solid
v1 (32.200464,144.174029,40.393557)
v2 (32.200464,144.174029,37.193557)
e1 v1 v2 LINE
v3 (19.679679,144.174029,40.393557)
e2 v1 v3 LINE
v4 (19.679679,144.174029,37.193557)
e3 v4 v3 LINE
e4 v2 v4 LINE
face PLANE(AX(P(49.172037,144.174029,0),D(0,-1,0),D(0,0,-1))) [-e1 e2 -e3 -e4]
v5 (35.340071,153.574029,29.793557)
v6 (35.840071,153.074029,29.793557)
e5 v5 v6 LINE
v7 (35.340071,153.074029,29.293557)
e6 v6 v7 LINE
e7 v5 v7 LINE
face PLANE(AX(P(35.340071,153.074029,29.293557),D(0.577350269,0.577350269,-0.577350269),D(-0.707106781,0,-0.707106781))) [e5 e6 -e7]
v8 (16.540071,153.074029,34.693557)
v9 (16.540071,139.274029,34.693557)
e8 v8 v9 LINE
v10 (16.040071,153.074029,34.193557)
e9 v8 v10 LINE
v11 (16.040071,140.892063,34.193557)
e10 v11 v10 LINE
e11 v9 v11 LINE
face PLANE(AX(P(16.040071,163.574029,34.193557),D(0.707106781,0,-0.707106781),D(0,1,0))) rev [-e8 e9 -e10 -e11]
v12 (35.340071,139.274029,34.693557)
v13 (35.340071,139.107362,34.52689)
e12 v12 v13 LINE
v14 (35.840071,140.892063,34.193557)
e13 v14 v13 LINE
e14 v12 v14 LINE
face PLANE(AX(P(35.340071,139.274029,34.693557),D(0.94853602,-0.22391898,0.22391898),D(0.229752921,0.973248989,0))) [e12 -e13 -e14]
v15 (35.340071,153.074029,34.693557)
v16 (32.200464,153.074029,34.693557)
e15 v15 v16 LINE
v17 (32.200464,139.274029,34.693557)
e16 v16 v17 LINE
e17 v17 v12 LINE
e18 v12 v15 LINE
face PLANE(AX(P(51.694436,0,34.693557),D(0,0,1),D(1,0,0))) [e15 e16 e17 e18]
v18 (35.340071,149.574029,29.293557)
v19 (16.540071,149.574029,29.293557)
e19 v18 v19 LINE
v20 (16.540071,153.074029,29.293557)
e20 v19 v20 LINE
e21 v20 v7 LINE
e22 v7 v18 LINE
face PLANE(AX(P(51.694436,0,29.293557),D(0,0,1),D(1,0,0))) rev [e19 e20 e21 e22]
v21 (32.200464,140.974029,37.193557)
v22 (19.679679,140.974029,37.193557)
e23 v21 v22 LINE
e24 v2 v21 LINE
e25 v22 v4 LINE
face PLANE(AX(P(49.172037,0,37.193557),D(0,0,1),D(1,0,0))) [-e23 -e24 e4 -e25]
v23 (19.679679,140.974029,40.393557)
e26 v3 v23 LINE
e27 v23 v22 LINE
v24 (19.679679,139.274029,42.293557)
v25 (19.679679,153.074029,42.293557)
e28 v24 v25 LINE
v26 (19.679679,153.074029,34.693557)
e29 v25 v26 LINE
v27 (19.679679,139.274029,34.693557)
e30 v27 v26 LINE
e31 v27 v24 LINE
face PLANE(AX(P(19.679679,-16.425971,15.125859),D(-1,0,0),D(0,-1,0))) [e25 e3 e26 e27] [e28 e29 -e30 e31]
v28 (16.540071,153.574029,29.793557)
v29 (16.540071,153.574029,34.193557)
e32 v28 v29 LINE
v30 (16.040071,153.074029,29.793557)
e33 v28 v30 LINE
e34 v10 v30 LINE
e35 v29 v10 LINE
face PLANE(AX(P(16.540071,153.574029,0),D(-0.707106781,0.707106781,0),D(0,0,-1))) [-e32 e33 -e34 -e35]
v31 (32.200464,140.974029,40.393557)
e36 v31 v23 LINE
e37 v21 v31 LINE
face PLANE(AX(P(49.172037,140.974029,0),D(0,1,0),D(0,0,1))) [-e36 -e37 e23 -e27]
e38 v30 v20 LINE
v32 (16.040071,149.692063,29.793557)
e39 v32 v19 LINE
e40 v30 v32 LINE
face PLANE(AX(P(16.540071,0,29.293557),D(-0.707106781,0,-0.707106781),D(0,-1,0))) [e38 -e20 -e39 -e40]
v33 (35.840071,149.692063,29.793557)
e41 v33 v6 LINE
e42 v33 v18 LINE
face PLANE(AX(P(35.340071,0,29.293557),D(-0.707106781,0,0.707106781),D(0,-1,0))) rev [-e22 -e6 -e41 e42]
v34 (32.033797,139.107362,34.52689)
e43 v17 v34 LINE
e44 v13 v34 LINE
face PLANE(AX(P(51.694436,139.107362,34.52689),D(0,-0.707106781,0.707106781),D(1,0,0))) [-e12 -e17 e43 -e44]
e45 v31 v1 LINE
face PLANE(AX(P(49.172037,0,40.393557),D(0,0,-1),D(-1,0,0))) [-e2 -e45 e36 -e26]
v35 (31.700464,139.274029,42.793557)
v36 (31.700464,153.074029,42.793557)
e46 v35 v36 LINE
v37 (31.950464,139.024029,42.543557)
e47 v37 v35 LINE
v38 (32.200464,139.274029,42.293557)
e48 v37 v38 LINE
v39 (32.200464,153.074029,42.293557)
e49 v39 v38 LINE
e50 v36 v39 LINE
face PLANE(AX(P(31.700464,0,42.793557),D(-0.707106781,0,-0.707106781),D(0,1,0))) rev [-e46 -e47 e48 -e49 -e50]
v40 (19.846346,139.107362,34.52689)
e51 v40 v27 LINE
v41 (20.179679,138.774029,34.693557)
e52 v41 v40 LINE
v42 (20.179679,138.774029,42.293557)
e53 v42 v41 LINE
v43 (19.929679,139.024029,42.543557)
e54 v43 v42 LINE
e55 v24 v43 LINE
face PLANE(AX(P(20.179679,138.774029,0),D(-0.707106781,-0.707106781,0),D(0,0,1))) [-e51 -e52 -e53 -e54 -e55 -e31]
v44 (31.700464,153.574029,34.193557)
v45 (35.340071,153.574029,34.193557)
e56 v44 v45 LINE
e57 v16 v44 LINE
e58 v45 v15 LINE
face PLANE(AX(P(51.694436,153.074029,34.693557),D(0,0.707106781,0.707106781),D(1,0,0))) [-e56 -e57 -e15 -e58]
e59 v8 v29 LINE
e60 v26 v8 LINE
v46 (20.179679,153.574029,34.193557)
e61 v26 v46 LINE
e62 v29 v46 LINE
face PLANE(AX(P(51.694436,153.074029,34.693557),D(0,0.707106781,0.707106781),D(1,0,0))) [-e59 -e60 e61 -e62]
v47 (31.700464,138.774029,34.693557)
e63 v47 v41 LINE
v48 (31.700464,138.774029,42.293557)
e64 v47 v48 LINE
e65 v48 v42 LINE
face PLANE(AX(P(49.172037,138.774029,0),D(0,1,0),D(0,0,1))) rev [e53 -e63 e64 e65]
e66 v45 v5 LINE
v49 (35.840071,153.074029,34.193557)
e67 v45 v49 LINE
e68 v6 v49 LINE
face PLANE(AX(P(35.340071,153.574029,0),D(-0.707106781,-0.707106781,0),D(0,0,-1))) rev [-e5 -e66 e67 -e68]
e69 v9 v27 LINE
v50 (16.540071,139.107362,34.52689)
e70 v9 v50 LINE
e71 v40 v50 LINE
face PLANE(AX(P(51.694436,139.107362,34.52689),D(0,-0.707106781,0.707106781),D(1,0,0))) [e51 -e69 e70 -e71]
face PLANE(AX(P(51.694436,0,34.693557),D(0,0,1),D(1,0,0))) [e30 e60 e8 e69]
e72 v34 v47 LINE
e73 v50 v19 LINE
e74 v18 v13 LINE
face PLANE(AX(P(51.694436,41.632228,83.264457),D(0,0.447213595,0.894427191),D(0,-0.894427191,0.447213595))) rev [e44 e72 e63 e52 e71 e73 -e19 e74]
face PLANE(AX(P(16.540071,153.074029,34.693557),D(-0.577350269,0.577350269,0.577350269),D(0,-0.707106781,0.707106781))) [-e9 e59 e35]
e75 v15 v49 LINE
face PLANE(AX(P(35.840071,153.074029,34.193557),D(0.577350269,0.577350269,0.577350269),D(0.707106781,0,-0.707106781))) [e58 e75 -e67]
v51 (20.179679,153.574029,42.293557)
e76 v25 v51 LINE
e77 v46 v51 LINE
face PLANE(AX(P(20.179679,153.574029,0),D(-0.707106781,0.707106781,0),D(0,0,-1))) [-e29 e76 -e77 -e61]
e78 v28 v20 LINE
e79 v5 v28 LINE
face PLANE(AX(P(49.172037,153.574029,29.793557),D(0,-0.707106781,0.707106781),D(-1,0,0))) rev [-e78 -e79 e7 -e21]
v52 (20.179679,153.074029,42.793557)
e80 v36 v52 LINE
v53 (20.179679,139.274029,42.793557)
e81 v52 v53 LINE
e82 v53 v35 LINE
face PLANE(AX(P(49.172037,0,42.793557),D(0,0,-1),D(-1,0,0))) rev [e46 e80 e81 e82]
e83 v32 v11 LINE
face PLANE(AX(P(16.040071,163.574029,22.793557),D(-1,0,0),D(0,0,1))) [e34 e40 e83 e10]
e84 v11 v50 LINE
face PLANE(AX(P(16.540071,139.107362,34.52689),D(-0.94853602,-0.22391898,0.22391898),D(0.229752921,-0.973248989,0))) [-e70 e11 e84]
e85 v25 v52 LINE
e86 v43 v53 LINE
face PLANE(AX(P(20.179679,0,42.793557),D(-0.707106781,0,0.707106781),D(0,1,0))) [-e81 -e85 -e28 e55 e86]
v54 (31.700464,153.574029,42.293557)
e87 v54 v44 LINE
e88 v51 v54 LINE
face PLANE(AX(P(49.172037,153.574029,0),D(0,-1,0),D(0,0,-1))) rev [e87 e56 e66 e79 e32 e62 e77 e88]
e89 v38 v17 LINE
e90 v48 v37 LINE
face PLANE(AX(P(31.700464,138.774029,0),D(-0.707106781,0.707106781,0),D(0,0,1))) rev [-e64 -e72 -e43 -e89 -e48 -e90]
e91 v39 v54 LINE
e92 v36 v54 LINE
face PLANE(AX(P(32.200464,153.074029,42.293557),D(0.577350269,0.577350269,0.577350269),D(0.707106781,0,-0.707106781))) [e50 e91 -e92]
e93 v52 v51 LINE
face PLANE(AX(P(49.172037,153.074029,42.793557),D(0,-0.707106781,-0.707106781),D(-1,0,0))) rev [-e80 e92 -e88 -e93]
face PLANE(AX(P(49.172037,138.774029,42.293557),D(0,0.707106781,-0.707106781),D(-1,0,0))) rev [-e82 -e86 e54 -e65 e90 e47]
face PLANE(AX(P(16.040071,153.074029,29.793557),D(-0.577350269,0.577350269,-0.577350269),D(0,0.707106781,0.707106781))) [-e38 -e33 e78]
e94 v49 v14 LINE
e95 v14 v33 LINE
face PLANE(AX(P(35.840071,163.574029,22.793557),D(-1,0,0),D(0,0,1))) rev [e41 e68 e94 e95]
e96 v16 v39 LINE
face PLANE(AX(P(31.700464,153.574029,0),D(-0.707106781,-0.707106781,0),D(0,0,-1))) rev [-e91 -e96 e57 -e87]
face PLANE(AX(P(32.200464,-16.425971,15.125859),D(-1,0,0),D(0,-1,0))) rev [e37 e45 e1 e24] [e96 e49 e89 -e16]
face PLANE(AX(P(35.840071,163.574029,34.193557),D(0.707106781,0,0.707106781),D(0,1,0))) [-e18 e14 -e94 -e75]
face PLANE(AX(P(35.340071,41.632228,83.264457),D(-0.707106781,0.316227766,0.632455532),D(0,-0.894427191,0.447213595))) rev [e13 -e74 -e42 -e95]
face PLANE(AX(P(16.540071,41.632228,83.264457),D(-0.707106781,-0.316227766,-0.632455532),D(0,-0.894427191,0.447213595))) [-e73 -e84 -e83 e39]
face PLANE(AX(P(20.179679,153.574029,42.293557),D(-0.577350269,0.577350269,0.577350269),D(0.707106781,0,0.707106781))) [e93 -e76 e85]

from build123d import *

# Parameters (mm, degrees)
BOSS_EXTRUDE1_DEPTH      = 6.260392
BOSS_EXTRUDE1_DEPTH_BACK = 6.260392
SKETCH4_W                = 8.1
SKETCH4_H                = 14.8
SKETCH4_W_2              = 3.2
SKETCH4_H_2              = 3.2
BOSS_EXTRUDE2_DEPTH      = 9.9
BOSS_EXTRUDE2_DEPTH_BACK = 9.9
CHAMFER2_SIZE            = 0.5


with BuildPart() as part:
    # Sketch4 → Boss-Extrude1 (new, two sides: drawn at the far end of the back side and taken through both)
    with BuildSketch(Plane(origin=(25.940071358, 0, 0), x_dir=(0, 0, -1), z_dir=(1, 0, 0)).offset(-BOSS_EXTRUDE1_DEPTH_BACK)):
        with Locations((-38.743556796, 146.174028513)):
            Rectangle(SKETCH4_W, SKETCH4_H)
        with Locations((-38.793556796, 142.574028513)):
            Rectangle(SKETCH4_W_2, SKETCH4_H_2, mode=Mode.SUBTRACT)
    extrude(amount=BOSS_EXTRUDE1_DEPTH + BOSS_EXTRUDE1_DEPTH_BACK)

    # Sketch4<5> → Boss-Extrude2 (add, two sides: drawn at the far end of the back side and taken through both)
    with BuildSketch(Plane(origin=(25.940071358, 0, 0), x_dir=(0, 0, -1), z_dir=(1, 0, 0)).offset(-BOSS_EXTRUDE2_DEPTH_BACK)):
        Polygon((-34.693556796, 153.574028513), (-34.693556796, 138.774028513), (-29.293556796, 149.574028513), (-29.293556796, 153.574028513), align=None)
    extrude(amount=BOSS_EXTRUDE2_DEPTH + BOSS_EXTRUDE2_DEPTH_BACK)

    # Chamfer1
    # the kernel refuses this chamfer: 0.5, 0.372677996 mm, written as the material it takes off along each edge
    with BuildSketch(Plane(origin=(31.867130024, 153.240695179, 42.460223463), x_dir=(0, 0.7071067811865475, -0.7071067811865475), z_dir=(0.5773502691896258, 0.5773502691896258, 0.5773502691896258)), Plane(origin=(35.506738024, 153.240695179, 34.360223463), x_dir=(0, 0.7071067811865475, -0.7071067811865475), z_dir=(0.5773502691896258, 0.5773502691896258, 0.5773502691896258)), Plane(origin=(16.373404691, 153.240695179, 34.360223463), x_dir=(0, -0.7071067811865475, 0.7071067811865475), z_dir=(-0.5773502691896258, 0.5773502691896258, 0.5773502691896258))) as chamfer1_piece_1:
        Polygon((-0.353553391, 0.204124145), (0.353553391, 0.204124145), (0, -0.40824829), align=None)
    extrude(amount=0.635085296, mode=Mode.SUBTRACT)
    with BuildSketch(Plane(origin=(20.013012691, 153.240695179, 42.460223463), x_dir=(0, 0.7071067811865475, -0.7071067811865475), z_dir=(-0.5773502691896258, 0.5773502691896258, 0.5773502691896258)), Plane(origin=(35.506738024, 153.240695179, 29.62689013), x_dir=(0.7071067811865475, -0.7071067811865475, 0), z_dir=(0.5773502691896258, 0.5773502691896258, -0.5773502691896258)), Plane(origin=(16.373404691, 153.240695179, 29.62689013), x_dir=(0, -0.7071067811865475, -0.7071067811865475), z_dir=(-0.5773502691896258, 0.5773502691896258, -0.5773502691896258))) as chamfer1_piece_2:
        Polygon((-0.353553391, -0.204124145), (0.353553391, -0.204124145), (0, 0.40824829), align=None)
    extrude(amount=0.635085296, mode=Mode.SUBTRACT)
    with BuildSketch(Plane(origin=(35.506738024, 139.75781762, 34.471334574), x_dir=(0, -0.7071067811865777, -0.7071067811865174), z_dir=(0.9485360198619486, -0.223918979794528, 0.22391897979454709))) as chamfer1_piece_3:
        Polygon((0.184955718, -0.526311482), (0.420657979, -0.526311482), (-0.605613697, 1.052622965), align=None)
    extrude(amount=0.64485025, mode=Mode.SUBTRACT)
    with BuildSketch(Plane(origin=(16.373404691, 139.75781762, 34.471334574), x_dir=(0, 0.7071067811865777, 0.7071067811865174), z_dir=(-0.9485360198619486, -0.223918979794528, 0.22391897979454709))) as chamfer1_piece_4:
        Polygon((-0.420657979, -0.526311482), (-0.184955718, -0.526311482), (0.605613697, 1.052622965), align=None)
    extrude(amount=0.64485025, mode=Mode.SUBTRACT)
    with BuildSketch(Plane(origin=(18.393837864, 138.774028513, 42.793556796), x_dir=(0, 0.999621916911297, 0.027495876610582292), z_dir=(1, 0, 0))) as chamfer1_piece_5:
        with BuildLine():
            Line((0.514336598, 0), (-0.028273577, -0.513558897))
            Line((-0.028273577, -0.513558897), (-0.038269797, -0.513283938))
            ThreePointArc((-0.038269797, -0.513283938), (-0.017064614, -0.256698915), (-0.009996219, 0.000274959))
            Line((-0.009996219, 0.000274959), (0.000274959, 0.009996219))
            ThreePointArc((0.000274959, 0.009996219), (0.257248832, 0.002927825), (0.514611556, 0.009996219))
            Line((0.514611556, 0.009996219), (0.514336598, 0))
        make_face()
    extrude(amount=15.092466988, mode=Mode.SUBTRACT)
    with BuildSketch(Plane(origin=(33.486304852, 153.574028513, 42.793556796), x_dir=(0, 0.02749587661058229, -0.9996219169112968), z_dir=(-1, 0, 0))) as chamfer1_piece_6:
        with BuildLine():
            Line((0.514336598, 0), (-0.028273577, 0.513558897))
            Line((-0.028273577, 0.513558897), (-0.038269797, 0.513283938))
            ThreePointArc((-0.038269797, 0.513283938), (-0.017064614, 0.256698915), (-0.009996219, -0.000274959))
            Line((-0.009996219, -0.000274959), (0.000274959, -0.009996219))
            ThreePointArc((0.000274959, -0.009996219), (0.257248832, -0.002927825), (0.514611556, -0.009996219))
            Line((0.514611556, -0.009996219), (0.514336598, 0))
        make_face()
    extrude(amount=15.092466988, mode=Mode.SUBTRACT)
    with BuildSketch(Plane(origin=(32.200463358, 154.859870007, 42.793556796), x_dir=(0.02749587661058229, 0, -0.9996219169112968), z_dir=(0, -1, 0)), Plane(origin=(19.679679358, 154.859870007, 42.793556796), x_dir=(0.999621916911297, 0, 0.027495876610582105), z_dir=(0, -1, 0)), Plane(origin=(16.040071358, 154.859870007, 34.693556796), x_dir=(0.999621916911297, 0, 0.027495876610582105), z_dir=(0, -1, 0))) as chamfer1_piece_7:
        with BuildLine():
            Line((0.514336598, 0), (-0.028273577, -0.513558897))
            Line((-0.028273577, -0.513558897), (-0.038269797, -0.513283938))
            ThreePointArc((-0.038269797, -0.513283938), (-0.017064614, -0.256698915), (-0.009996219, 0.000274959))
            Line((-0.009996219, 0.000274959), (0.000274959, 0.009996219))
            ThreePointArc((0.000274959, 0.009996219), (0.257248832, 0.002927825), (0.514611556, 0.009996219))
            Line((0.514611556, 0.009996219), (0.514336598, 0))
        make_face()
    extrude(amount=17.371682988, mode=Mode.SUBTRACT)
    with BuildSketch(Plane(origin=(32.200463358, 153.574028513, 34.693556796), x_dir=(-0.999621916911297, 0.027495876610582105, 0), z_dir=(0, 0, 1))) as chamfer1_piece_8:
        with BuildLine():
            Line((0.514336598, 0), (-0.028273577, 0.513558897))
            Line((-0.028273577, 0.513558897), (-0.038269797, 0.513283938))
            ThreePointArc((-0.038269797, 0.513283938), (-0.017064614, 0.256698915), (-0.009996219, -0.000274959))
            Line((-0.009996219, -0.000274959), (0.000274959, -0.009996219))
            ThreePointArc((0.000274959, -0.009996219), (0.257248832, -0.002927825), (0.514611556, -0.009996219))
            Line((0.514611556, -0.009996219), (0.514336598, 0))
        make_face()
    extrude(amount=9.385841494, mode=Mode.SUBTRACT)
    with BuildSketch(Plane(origin=(19.679679358, 153.574028513, 34.693556796), x_dir=(0.999621916911297, 0.027495876610582105, 0), z_dir=(0, 0, 1))) as chamfer1_piece_9:
        with BuildLine():
            Line((0.514336598, 0), (-0.028273577, -0.513558897))
            Line((-0.028273577, -0.513558897), (-0.038269797, -0.513283938))
            ThreePointArc((-0.038269797, -0.513283938), (-0.017064614, -0.256698915), (-0.009996219, 0.000274959))
            Line((-0.009996219, 0.000274959), (0.000274959, 0.009996219))
            ThreePointArc((0.000274959, 0.009996219), (0.257248832, 0.002927825), (0.514611556, 0.009996219))
            Line((0.514611556, 0.009996219), (0.514336598, 0))
        make_face()
    extrude(amount=9.385841494, mode=Mode.SUBTRACT)
    with BuildSketch(Plane(origin=(37.125912852, 153.574028513, 34.693556796), x_dir=(0, -0.999621916911297, 0.027495876610582292), z_dir=(-1, 0, 0))) as chamfer1_piece_10:
        with BuildLine():
            Line((0.514336598, 0), (-0.028273577, -0.513558897))
            Line((-0.028273577, -0.513558897), (-0.038269797, -0.513283938))
            ThreePointArc((-0.038269797, -0.513283938), (-0.017064614, -0.256698915), (-0.009996219, 0.000274959))
            Line((-0.009996219, 0.000274959), (0.000274959, 0.009996219))
            ThreePointArc((0.000274959, 0.009996219), (0.257248832, 0.002927825), (0.514611556, 0.009996219))
            Line((0.514611556, 0.009996219), (0.514336598, 0))
        make_face()
    extrude(amount=4.925449494, mode=Mode.SUBTRACT)
    with BuildSketch(Plane(origin=(35.840071358, 153.574028513, 28.007715302), x_dir=(-0.999621916911297, 0.027495876610582292, 0), z_dir=(0, 0, 1))) as chamfer1_piece_11:
        with BuildLine():
            Line((0.514336598, 0), (-0.028273577, 0.513558897))
            Line((-0.028273577, 0.513558897), (-0.038269797, 0.513283938))
            ThreePointArc((-0.038269797, 0.513283938), (-0.017064614, 0.256698915), (-0.009996219, -0.000274959))
            Line((-0.009996219, -0.000274959), (0.000274959, -0.009996219))
            ThreePointArc((0.000274959, -0.009996219), (0.257248832, -0.002927825), (0.514611556, -0.009996219))
            Line((0.514611556, -0.009996219), (0.514336598, 0))
        make_face()
    extrude(amount=7.971682988, mode=Mode.SUBTRACT)
    with BuildSketch(Plane(origin=(37.125912852, 153.574028513, 29.293556796), x_dir=(0, 0.027495876610582105, 0.999621916911297), z_dir=(-1, 0, 0))) as chamfer1_piece_12:
        with BuildLine():
            Line((0.514336598, 0), (-0.028273577, -0.513558897))
            Line((-0.028273577, -0.513558897), (-0.038269797, -0.513283938))
            ThreePointArc((-0.038269797, -0.513283938), (-0.017064614, -0.256698915), (-0.009996219, 0.000274959))
            Line((-0.009996219, 0.000274959), (0.000274959, 0.009996219))
            ThreePointArc((0.000274959, 0.009996219), (0.257248832, 0.002927825), (0.514611556, 0.009996219))
            Line((0.514611556, 0.009996219), (0.514336598, 0))
        make_face()
    extrude(amount=22.371682988, mode=Mode.SUBTRACT)
    with BuildSketch(Plane(origin=(16.040071358, 153.574028513, 28.007715302), x_dir=(0.999621916911297, 0.027495876610582105, 0), z_dir=(0, 0, 1))) as chamfer1_piece_13:
        with BuildLine():
            Line((0.514336598, 0), (-0.028273577, -0.513558897))
            Line((-0.028273577, -0.513558897), (-0.038269797, -0.513283938))
            ThreePointArc((-0.038269797, -0.513283938), (-0.017064614, -0.256698915), (-0.009996219, 0.000274959))
            Line((-0.009996219, 0.000274959), (0.000274959, 0.009996219))
            ThreePointArc((0.000274959, 0.009996219), (0.257248832, 0.002927825), (0.514611556, 0.009996219))
            Line((0.514611556, 0.009996219), (0.514336598, 0))
        make_face()
    extrude(amount=7.971682988, mode=Mode.SUBTRACT)
    with BuildSketch(Plane(origin=(35.840071358, 148.288187019, 29.293556796), x_dir=(0.027495876610582105, 0, 0.999621916911297), z_dir=(0, 1, 0)), Plane(origin=(16.040071358, 148.288187019, 29.293556796), x_dir=(0.9996219169112968, 0, -0.027495876610589005), z_dir=(0, 1, 0))) as chamfer1_piece_14:
        with BuildLine():
            Line((0.514336598, 0), (-0.028273577, -0.513558897))
            Line((-0.028273577, -0.513558897), (-0.038269797, -0.513283938))
            ThreePointArc((-0.038269797, -0.513283938), (-0.017064614, -0.256698915), (-0.009996219, 0.000274959))
            Line((-0.009996219, 0.000274959), (0.000274959, 0.009996219))
            ThreePointArc((0.000274959, 0.009996219), (0.257248832, 0.002927825), (0.514611556, 0.009996219))
            Line((0.514611556, 0.009996219), (0.514336598, 0))
        make_face()
    extrude(amount=6.571682988, mode=Mode.SUBTRACT)
    with BuildSketch(Plane(origin=(35.840071358, 137.623936917, 35.268602594), x_dir=(-0.999621916911297, -0.012296529840442863, -0.024593059680883298), z_dir=(0, 0.8944271909998982, -0.44721359549999323))) as chamfer1_piece_15:
        with BuildLine():
            Line((0.514336598, 0), (-0.028273577, 0.513558897))
            Line((-0.028273577, 0.513558897), (-0.038269797, 0.513283938))
            ThreePointArc((-0.038269797, 0.513283938), (-0.017064614, 0.256698915), (-0.009996219, -0.000274959))
            Line((-0.009996219, -0.000274959), (0.000274959, -0.009996219))
            ThreePointArc((0.000274959, -0.009996219), (0.257248832, -0.002927825), (0.514611556, -0.009996219))
            Line((0.514611556, -0.009996219), (0.514336598, 0))
        make_face()
    extrude(amount=14.646450066, mode=Mode.SUBTRACT)
    with BuildSketch(Plane(origin=(16.040071358, 137.623936917, 35.268602594), x_dir=(0.999621916911297, -0.012296529840442778, -0.024593059680883128), z_dir=(0, 0.8944271909998982, -0.44721359549999323))) as chamfer1_piece_16:
        with BuildLine():
            Line((0.514336598, 0), (-0.028273577, -0.513558897))
            Line((-0.028273577, -0.513558897), (-0.038269797, -0.513283938))
            ThreePointArc((-0.038269797, -0.513283938), (-0.017064614, -0.256698915), (-0.009996219, 0.000274959))
            Line((-0.009996219, 0.000274959), (0.000274959, 0.009996219))
            ThreePointArc((0.000274959, 0.009996219), (0.257248832, 0.002927825), (0.514611556, 0.009996219))
            Line((0.514611556, 0.009996219), (0.514336598, 0))
        make_face()
    extrude(amount=14.646450066, mode=Mode.SUBTRACT)
    with BuildSketch(Plane(origin=(19.679679358, 153.574028513, 34.693556796), x_dir=(0, 0.02749587661058229, -0.9996219169112968), z_dir=(-1, 0, 0))) as chamfer1_piece_17:
        with BuildLine():
            Line((0.514336598, 0), (-0.028273577, 0.513558897))
            Line((-0.028273577, 0.513558897), (-0.038269797, 0.513283938))
            ThreePointArc((-0.038269797, 0.513283938), (-0.017064614, 0.256698915), (-0.009996219, -0.000274959))
            Line((-0.009996219, -0.000274959), (0.000274959, -0.009996219))
            ThreePointArc((0.000274959, -0.009996219), (0.257248832, -0.002927825), (0.514611556, -0.009996219))
            Line((0.514611556, -0.009996219), (0.514336598, 0))
        make_face()
    extrude(amount=4.925449494, mode=Mode.SUBTRACT)
    with BuildSketch(Plane(origin=(35.840071358, 154.859870007, 34.693556796), x_dir=(-0.999621916911297, 0, 0.027495876610582292), z_dir=(0, -1, 0))) as chamfer1_piece_18:
        with BuildLine():
            Line((0.514336598, 0), (-0.028273577, 0.513558897))
            Line((-0.028273577, 0.513558897), (-0.038269797, 0.513283938))
            ThreePointArc((-0.038269797, 0.513283938), (-0.017064614, 0.256698915), (-0.009996219, -0.000274959))
            Line((-0.009996219, -0.000274959), (0.000274959, -0.009996219))
            ThreePointArc((0.000274959, -0.009996219), (0.257248832, -0.002927825), (0.514611556, -0.009996219))
            Line((0.514611556, -0.009996219), (0.514336598, 0))
        make_face()
    extrude(amount=17.371682988, mode=Mode.SUBTRACT)
    with BuildSketch(Plane(origin=(32.200463358, 138.774028513, 34.693556796), x_dir=(0, 0.999621916911297, 0.027495876610582292), z_dir=(1, 0, 0))) as chamfer1_piece_19:
        with BuildLine():
            Line((0.514336598, 0), (0.31409902, -0.189516883))
            Line((0.31409902, -0.189516883), (0.309382645, -0.198334808))
            ThreePointArc((0.309382645, -0.198334808), (0.156807481, -0.095210948), (-0.004716376, -0.008817925))
            Line((-0.004716376, -0.008817925), (0.000274959, 0.009996219))
            ThreePointArc((0.000274959, 0.009996219), (0.257248832, 0.002927825), (0.514611556, 0.009996219))
            Line((0.514611556, 0.009996219), (0.514336598, 0))
        make_face()
    extrude(amount=4.925449494, mode=Mode.SUBTRACT)
    with BuildSketch(Plane(origin=(14.754229864, 138.774028513, 34.693556796), x_dir=(0, 0.8700995906888151, -0.492875950197569), z_dir=(1, 0, 0))) as chamfer1_piece_20:
        with BuildLine():
            Line((0.366844441, 0), (0.440384543, 0.26571336))
            Line((0.440384543, 0.26571336), (0.435455784, 0.274414356))
            ThreePointArc((0.435455784, 0.274414356), (0.218748671, 0.135405143), (-0.00492876, 0.008700996))
            Line((-0.00492876, 0.008700996), (0.000517213, -0.009986616))
            ThreePointArc((0.000517213, -0.009986616), (0.183448762, -0.00051248), (0.367361654, -0.009986616))
            Line((0.367361654, -0.009986616), (0.366844441, 0))
        make_face()
    extrude(amount=4.925449494, mode=Mode.SUBTRACT)
    with BuildSketch(Plane(origin=(37.125912852, 153.574028513, 34.693556796), x_dir=(0, -0.999621916911297, 0.027495876610582292), z_dir=(-1, 0, 0))) as chamfer1_piece_21a_section:
        with BuildLine():
            Line((0.514336598, 0), (-0.028273577, -0.513558897))
            Line((-0.028273577, -0.513558897), (-0.038269797, -0.513283938))
            ThreePointArc((-0.038269797, -0.513283938), (-0.017064614, -0.256698915), (-0.009996219, 0.000274959))
            Line((-0.009996219, 0.000274959), (0.000274959, 0.009996219))
            ThreePointArc((0.000274959, 0.009996219), (0.257248832, 0.002927825), (0.514611556, 0.009996219))
            Line((0.514611556, 0.009996219), (0.514336598, 0))
        make_face()
    chamfer1_piece_21a = extrude(amount=6.211290988, mode=Mode.PRIVATE)
    chamfer1_piece_21a = split(chamfer1_piece_21a, bisect_by=Plane(origin=(32.200463358, 153.409131699, 34.528659983), z_dir=(-1, 0, 0)), keep=Keep.TOP, mode=Mode.PRIVATE)
    with BuildSketch(Plane(origin=(32.200463358, 153.574028513, 33.407715302), x_dir=(-0.999621916911297, 0.027495876610582105, 0), z_dir=(0, 0, 1))) as chamfer1_piece_21b_section:
        with BuildLine():
            Line((0.514336598, 0), (-0.028273577, 0.513558897))
            Line((-0.028273577, 0.513558897), (-0.038269797, 0.513283938))
            ThreePointArc((-0.038269797, 0.513283938), (-0.017064614, 0.256698915), (-0.009996219, -0.000274959))
            Line((-0.009996219, -0.000274959), (0.000274959, -0.009996219))
            ThreePointArc((0.000274959, -0.009996219), (0.257248832, -0.002927825), (0.514611556, -0.009996219))
            Line((0.514611556, -0.009996219), (0.514336598, 0))
        make_face()
    chamfer1_piece_21b = extrude(amount=10.671682988, mode=Mode.PRIVATE)
    chamfer1_piece_21b = split(chamfer1_piece_21b, bisect_by=Plane(origin=(32.035566544, 153.409131699, 34.693556796), z_dir=(0, 0, -1)), keep=Keep.TOP, mode=Mode.PRIVATE)
    chamfer1_piece_21 = chamfer1_piece_21a & chamfer1_piece_21b
    add(chamfer1_piece_21, mode=Mode.SUBTRACT)
    with BuildSketch(Plane(origin=(19.679679358, 153.574028513, 33.407715302), x_dir=(0.999621916911297, 0.027495876610582105, 0), z_dir=(0, 0, 1))) as chamfer1_piece_22a_section:
        with BuildLine():
            Line((0.514336598, 0), (-0.028273577, -0.513558897))
            Line((-0.028273577, -0.513558897), (-0.038269797, -0.513283938))
            ThreePointArc((-0.038269797, -0.513283938), (-0.017064614, -0.256698915), (-0.009996219, 0.000274959))
            Line((-0.009996219, 0.000274959), (0.000274959, 0.009996219))
            ThreePointArc((0.000274959, 0.009996219), (0.257248832, 0.002927825), (0.514611556, 0.009996219))
            Line((0.514611556, 0.009996219), (0.514336598, 0))
        make_face()
    chamfer1_piece_22a = extrude(amount=10.671682988, mode=Mode.PRIVATE)
    chamfer1_piece_22a = split(chamfer1_piece_22a, bisect_by=Plane(origin=(19.844576171, 153.409131699, 34.693556796), z_dir=(0, 0, -1)), keep=Keep.TOP, mode=Mode.PRIVATE)
    with BuildSketch(Plane(origin=(20.965520852, 153.574028513, 34.693556796), x_dir=(0, 0.02749587661058229, -0.9996219169112968), z_dir=(-1, 0, 0))) as chamfer1_piece_22b_section:
        with BuildLine():
            Line((0.514336598, 0), (-0.028273577, 0.513558897))
            Line((-0.028273577, 0.513558897), (-0.038269797, 0.513283938))
            ThreePointArc((-0.038269797, 0.513283938), (-0.017064614, 0.256698915), (-0.009996219, -0.000274959))
            Line((-0.009996219, -0.000274959), (0.000274959, -0.009996219))
            ThreePointArc((0.000274959, -0.009996219), (0.257248832, -0.002927825), (0.514611556, -0.009996219))
            Line((0.514611556, -0.009996219), (0.514336598, 0))
        make_face()
    chamfer1_piece_22b = extrude(amount=6.211290988, mode=Mode.PRIVATE)
    chamfer1_piece_22b = split(chamfer1_piece_22b, bisect_by=Plane(origin=(19.679679358, 153.409131699, 34.528659983), z_dir=(1, 0, 0)), keep=Keep.TOP, mode=Mode.PRIVATE)
    chamfer1_piece_22 = chamfer1_piece_22a & chamfer1_piece_22b
    add(chamfer1_piece_22, mode=Mode.SUBTRACT)

    # Chamfer2
    chamfer2_edges = [part.edges().sort_by_distance(p)[0] for p in [
        (32.200463358, 138.774028513, 38.493556796),
        (19.679679358, 138.774028513, 38.493556796),
    ]]
    chamfer(chamfer2_edges, length=CHAMFER2_SIZE)


solid = part.part
